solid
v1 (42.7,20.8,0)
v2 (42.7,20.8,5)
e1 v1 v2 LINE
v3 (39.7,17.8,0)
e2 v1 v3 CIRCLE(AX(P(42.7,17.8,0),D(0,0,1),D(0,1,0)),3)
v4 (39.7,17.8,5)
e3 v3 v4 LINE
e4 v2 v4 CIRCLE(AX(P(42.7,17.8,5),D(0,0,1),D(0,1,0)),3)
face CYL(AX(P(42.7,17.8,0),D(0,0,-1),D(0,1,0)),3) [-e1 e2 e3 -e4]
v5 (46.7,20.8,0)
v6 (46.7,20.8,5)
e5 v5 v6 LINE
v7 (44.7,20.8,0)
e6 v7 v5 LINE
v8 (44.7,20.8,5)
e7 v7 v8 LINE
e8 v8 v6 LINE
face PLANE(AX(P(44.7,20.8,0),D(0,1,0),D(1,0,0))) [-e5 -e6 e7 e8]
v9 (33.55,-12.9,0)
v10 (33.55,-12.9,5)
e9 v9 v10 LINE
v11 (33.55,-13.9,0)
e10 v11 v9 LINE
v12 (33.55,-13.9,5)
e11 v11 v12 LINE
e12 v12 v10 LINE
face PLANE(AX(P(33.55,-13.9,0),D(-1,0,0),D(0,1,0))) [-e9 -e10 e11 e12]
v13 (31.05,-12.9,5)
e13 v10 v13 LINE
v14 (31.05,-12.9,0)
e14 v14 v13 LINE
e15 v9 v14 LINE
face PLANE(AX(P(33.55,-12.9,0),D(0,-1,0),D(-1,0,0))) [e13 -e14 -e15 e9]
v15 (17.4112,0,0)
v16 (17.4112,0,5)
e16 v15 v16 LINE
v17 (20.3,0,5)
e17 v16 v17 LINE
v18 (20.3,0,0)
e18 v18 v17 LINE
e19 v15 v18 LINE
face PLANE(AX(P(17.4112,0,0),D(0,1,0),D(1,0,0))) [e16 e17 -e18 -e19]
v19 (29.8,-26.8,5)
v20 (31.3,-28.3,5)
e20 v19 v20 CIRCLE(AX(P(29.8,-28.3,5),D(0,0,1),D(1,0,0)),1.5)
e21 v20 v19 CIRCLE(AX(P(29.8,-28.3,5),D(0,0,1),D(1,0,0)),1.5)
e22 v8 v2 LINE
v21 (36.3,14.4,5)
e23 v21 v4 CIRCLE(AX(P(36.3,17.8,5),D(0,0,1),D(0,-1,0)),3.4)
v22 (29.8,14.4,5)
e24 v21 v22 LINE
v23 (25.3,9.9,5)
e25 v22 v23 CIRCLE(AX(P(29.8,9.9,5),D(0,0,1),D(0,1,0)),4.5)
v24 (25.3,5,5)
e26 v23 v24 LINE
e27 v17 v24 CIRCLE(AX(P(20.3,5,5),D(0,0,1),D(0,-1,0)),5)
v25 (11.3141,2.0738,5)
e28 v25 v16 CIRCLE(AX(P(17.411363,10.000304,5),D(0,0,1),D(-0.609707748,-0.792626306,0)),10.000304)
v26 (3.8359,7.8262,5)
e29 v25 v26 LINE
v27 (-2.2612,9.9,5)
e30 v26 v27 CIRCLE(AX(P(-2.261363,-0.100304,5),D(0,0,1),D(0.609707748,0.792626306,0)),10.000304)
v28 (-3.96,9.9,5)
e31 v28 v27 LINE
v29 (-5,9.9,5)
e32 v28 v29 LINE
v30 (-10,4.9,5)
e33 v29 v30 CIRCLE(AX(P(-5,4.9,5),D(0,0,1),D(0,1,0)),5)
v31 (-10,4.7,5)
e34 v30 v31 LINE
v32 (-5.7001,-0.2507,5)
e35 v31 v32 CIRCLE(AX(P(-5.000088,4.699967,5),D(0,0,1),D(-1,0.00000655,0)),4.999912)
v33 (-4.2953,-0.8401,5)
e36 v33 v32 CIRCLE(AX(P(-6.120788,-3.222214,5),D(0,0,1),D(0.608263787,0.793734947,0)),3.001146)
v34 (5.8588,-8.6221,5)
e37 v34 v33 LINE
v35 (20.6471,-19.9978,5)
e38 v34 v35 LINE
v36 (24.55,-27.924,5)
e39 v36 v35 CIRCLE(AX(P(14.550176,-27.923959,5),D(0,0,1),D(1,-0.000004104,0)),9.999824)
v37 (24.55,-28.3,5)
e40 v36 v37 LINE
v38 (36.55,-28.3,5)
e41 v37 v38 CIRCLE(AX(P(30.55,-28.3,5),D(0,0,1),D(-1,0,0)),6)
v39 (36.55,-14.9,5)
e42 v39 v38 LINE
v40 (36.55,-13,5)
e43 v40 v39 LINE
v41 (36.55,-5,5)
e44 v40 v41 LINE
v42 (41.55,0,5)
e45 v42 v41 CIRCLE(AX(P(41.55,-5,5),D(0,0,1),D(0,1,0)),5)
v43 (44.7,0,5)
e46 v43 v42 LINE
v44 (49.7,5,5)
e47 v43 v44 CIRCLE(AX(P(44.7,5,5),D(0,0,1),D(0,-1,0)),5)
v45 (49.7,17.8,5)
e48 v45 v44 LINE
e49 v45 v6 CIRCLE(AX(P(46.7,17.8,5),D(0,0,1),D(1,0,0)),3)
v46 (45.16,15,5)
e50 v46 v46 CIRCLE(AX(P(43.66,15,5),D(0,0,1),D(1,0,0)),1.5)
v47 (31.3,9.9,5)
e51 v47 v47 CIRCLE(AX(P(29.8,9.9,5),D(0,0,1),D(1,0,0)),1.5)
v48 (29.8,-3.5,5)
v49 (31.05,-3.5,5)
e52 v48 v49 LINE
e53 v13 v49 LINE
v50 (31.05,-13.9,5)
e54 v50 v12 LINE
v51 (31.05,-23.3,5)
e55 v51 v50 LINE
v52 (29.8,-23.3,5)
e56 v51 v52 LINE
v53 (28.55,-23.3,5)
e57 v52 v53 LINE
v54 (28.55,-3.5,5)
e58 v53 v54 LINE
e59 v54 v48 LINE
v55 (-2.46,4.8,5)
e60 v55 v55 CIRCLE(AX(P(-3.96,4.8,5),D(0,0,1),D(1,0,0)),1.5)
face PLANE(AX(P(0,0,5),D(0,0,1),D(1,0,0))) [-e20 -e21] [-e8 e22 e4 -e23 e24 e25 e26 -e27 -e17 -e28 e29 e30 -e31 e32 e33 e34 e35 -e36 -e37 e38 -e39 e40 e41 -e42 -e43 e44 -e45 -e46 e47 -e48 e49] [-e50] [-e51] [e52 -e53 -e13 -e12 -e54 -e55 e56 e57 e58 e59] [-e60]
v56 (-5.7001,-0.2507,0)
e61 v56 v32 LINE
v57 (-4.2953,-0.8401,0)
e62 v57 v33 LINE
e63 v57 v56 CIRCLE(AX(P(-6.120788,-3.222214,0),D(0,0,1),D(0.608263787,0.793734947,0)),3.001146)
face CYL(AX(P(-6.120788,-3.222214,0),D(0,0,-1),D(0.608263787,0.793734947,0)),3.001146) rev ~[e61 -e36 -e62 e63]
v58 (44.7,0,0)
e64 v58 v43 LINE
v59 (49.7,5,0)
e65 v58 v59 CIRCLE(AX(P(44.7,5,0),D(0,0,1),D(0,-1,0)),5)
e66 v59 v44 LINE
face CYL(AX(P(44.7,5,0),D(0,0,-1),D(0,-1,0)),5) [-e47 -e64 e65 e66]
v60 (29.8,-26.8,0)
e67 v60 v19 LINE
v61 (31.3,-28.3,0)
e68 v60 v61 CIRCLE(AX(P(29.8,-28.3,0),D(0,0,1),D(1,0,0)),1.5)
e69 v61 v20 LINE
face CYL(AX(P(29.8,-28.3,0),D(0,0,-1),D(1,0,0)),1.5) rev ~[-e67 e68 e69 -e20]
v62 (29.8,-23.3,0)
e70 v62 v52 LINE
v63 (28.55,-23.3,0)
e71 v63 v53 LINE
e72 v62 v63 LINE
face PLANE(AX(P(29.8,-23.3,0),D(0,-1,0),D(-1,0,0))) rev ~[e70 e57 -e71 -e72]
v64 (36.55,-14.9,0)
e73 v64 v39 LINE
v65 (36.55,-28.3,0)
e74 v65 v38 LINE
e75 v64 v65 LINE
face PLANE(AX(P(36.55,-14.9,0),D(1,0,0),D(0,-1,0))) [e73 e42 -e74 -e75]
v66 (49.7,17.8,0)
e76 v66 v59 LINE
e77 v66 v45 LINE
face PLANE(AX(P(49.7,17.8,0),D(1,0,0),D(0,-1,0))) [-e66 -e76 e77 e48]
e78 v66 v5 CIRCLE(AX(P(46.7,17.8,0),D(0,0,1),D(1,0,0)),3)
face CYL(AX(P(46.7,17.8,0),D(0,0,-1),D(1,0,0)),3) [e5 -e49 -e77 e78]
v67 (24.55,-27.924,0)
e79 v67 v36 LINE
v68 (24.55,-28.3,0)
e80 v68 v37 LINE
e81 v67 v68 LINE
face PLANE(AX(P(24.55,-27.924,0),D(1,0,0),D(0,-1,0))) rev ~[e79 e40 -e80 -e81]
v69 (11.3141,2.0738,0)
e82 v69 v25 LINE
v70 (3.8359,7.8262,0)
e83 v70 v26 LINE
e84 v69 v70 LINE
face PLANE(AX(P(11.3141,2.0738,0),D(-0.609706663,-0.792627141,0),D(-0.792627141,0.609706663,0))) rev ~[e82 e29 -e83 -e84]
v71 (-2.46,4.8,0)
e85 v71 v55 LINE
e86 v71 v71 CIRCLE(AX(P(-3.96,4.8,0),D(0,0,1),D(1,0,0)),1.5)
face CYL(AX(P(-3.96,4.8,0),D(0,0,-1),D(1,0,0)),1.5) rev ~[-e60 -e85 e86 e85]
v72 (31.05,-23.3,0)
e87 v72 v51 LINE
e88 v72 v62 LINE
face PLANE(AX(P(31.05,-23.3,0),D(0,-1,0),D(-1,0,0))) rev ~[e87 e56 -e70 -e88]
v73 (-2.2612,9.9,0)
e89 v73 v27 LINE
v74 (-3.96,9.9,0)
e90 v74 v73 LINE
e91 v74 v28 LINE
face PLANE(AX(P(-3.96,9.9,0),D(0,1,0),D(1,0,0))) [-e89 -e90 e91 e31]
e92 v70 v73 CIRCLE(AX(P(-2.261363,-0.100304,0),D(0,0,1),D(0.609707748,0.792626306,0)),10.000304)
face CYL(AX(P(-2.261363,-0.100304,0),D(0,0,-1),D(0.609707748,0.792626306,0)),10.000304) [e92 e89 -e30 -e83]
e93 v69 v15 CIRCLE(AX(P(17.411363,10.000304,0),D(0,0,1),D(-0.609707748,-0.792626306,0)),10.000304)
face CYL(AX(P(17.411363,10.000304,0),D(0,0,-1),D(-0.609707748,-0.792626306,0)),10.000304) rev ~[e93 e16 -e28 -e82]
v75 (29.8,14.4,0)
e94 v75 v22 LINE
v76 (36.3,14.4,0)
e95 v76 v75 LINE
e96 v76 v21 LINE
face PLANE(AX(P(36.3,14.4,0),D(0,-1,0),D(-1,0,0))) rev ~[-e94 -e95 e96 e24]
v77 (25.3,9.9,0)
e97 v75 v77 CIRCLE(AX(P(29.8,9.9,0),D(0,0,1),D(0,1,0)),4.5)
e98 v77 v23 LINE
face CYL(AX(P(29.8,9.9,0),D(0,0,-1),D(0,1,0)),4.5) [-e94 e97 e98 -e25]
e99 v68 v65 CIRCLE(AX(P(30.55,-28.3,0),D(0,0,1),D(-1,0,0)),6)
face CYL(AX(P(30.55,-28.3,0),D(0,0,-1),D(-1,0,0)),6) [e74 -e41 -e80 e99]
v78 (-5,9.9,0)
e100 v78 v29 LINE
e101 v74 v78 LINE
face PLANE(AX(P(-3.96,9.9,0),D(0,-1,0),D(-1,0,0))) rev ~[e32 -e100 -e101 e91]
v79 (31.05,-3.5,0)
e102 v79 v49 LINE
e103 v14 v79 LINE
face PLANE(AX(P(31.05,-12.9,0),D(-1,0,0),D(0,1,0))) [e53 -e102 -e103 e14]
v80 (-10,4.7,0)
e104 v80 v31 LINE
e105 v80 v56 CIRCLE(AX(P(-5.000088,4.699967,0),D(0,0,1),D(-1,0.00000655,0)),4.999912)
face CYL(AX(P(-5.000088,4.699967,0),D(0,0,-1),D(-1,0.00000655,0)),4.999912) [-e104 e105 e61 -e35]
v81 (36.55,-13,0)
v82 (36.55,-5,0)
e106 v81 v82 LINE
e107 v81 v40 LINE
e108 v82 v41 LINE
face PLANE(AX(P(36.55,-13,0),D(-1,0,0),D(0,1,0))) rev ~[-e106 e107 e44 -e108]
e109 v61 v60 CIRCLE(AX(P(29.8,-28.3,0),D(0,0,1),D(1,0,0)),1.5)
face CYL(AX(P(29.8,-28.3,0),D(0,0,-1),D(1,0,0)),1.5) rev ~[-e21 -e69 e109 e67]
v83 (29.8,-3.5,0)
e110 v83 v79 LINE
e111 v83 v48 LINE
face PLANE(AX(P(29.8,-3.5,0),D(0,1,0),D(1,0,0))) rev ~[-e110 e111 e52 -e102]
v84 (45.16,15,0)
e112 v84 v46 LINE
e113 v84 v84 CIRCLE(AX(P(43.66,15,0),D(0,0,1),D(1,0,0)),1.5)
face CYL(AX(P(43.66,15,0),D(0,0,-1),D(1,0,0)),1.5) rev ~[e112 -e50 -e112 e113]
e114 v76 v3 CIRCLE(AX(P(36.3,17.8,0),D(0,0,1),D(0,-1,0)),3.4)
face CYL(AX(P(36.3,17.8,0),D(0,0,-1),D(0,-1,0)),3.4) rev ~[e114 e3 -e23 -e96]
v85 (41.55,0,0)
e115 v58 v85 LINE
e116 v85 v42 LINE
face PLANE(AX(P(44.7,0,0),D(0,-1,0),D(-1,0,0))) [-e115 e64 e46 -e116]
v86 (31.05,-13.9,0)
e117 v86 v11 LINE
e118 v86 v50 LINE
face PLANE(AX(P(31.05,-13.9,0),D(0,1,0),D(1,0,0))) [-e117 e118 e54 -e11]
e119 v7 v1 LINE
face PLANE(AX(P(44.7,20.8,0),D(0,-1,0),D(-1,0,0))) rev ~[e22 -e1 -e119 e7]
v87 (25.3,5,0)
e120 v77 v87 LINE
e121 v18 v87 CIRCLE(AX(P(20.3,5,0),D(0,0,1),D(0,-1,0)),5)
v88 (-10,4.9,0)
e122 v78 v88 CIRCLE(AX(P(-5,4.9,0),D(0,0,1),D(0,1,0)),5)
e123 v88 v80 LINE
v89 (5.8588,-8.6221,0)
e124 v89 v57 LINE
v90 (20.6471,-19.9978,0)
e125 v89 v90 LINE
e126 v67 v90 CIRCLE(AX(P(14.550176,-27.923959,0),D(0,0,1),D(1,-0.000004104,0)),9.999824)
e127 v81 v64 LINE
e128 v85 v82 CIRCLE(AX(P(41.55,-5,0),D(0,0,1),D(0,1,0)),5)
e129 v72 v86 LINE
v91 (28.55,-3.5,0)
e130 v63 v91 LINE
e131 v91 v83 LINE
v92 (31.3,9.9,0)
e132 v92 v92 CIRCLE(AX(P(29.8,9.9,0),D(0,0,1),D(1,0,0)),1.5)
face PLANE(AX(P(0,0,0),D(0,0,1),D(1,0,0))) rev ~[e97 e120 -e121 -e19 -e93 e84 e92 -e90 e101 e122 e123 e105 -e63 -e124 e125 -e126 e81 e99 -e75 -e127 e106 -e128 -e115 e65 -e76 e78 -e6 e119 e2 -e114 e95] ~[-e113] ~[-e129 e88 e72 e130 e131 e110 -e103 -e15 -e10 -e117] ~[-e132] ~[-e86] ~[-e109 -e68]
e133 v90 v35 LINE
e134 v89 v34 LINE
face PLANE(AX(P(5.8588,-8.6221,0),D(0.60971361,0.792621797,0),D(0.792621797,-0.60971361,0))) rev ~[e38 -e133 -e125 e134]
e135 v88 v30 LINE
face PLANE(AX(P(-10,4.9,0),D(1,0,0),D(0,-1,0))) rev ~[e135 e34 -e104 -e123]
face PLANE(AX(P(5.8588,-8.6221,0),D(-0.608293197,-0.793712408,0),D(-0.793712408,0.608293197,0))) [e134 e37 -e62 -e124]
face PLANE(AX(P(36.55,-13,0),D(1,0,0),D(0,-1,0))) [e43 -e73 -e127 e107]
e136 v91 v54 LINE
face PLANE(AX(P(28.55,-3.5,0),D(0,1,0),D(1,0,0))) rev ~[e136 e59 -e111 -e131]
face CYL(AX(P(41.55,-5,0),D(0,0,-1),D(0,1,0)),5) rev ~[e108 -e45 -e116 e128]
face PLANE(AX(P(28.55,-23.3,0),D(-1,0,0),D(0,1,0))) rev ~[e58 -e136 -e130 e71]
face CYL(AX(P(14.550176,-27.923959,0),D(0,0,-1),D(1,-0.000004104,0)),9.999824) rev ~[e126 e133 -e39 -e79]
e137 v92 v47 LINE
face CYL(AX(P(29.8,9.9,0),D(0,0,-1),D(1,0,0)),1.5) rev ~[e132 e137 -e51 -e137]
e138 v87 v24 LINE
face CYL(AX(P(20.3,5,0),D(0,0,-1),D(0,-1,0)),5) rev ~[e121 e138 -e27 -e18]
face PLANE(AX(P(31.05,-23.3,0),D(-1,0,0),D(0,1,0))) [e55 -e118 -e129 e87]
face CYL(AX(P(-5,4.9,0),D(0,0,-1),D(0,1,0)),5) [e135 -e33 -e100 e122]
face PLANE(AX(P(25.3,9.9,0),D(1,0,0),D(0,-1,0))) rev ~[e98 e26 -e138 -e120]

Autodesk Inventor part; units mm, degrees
ref_plane "YZ Plane" through (0, 0, 0) normal (1, 0, 0) x (0, 1, 0)
ref_plane "XZ Plane" through (0, 0, 0) normal (0, 1, 0) x (-1, 0, 0)
ref_plane "XY Plane" through (0, 0, 0) normal (0, 0, 1) x (1, 0, 0)
sketch "Sketch1" plane through (0, 0, 0) normal (0, 0, 1) x (1, 0, 0)
  line L0 (17.4112, 0) -> (20.3, 0)
  circle A0 centre (43.66, 15) radius 1.5
  circle A1 centre (-3.96, 4.8) radius 1.5
  line L1 (29.8, -3.5) -> (31.05, -3.5)
  line L2 (31.05, -23.3) -> (28.55, -23.3)
  line L3 (28.55, -23.3) -> (28.55, -3.5)
  line L4 (28.55, -3.5) -> (29.8, -3.5)
  line L5 (29.8, -23.3) -> (29.8, -28.3)
  circle A2 centre (29.8, -28.3) radius 1.5
  line L6 (31.05, -23.3) -> (31.05, -13.9)
  line L7 (31.05, -13.9) -> (33.55, -13.9)
  line L8 (33.55, -13.9) -> (33.55, -12.9)
  line L9 (33.55, -12.9) -> (31.05, -12.9)
  line L10 (31.05, -12.9) -> (31.05, -3.5)
  line L11 (36.55, -14.9) -> (36.55, -28.3)
  line L12 (49.7, 17.8) -> (49.7, 5)
  line L13 (36.55, -13) -> (36.55, -14.9)
  arc A3 (24.55, -28.3) -> (36.55, -28.3) centre (30.55, -28.3) ccw
  line L14 (24.55, -27.924) -> (24.55, -28.3)
  line L15 (5.8588, -8.6221) -> (20.6471, -19.9978)
  circle A4 centre (29.8, 9.9) radius 1.5
  arc A5 (29.8, 14.4) -> (25.3, 9.9) centre (29.8, 9.9) ccw
  line L16 (25.3, 9.9) -> (25.3, 5)
  line L17 (36.55, -13) -> (36.55, -5)
  line L18 (44.7, 0) -> (41.55, 0)
  line L19 (36.3, 14.4) -> (29.8, 14.4)
  arc A6 (36.3, 14.4) -> (39.7, 17.8) centre (36.3, 17.8) ccw
  arc A7 (41.55, 0) -> (36.55, -5) centre (41.55, -5) ccw
  arc A8 (44.7, 0) -> (49.7, 5) centre (44.7, 5) ccw
  arc A9 (20.3, 0) -> (25.3, 5) centre (20.3, 5) ccw
  arc A10 (24.55, -27.924) -> (20.6471, -19.9978) centre (14.55, -27.924) ccw
  line L20 (-3.96, 9.9) -> (-2.2612, 9.9)
  line L21 (-3.96, 9.9) -> (-5, 9.9)
  line L22 (-10, 4.9) -> (-10, 4.7)
  line L23 (11.3141, 2.0738) -> (3.8359, 7.8262)
  arc A11 (11.3141, 2.0738) -> (17.4112, 0) centre (17.4112, 10) ccw
  arc A12 (3.8359, 7.8262) -> (-2.2612, 9.9) centre (-2.2612, -0.1) ccw
  arc A13 (-5, 9.9) -> (-10, 4.9) centre (-5, 4.9) ccw
  arc A14 (-10, 4.7) -> (-5.7001, -0.2507) centre (-5, 4.7) ccw
  line L24 (5.8588, -8.6221) -> (-4.2953, -0.8401)
  arc A15 (-4.2953, -0.8401) -> (-5.7001, -0.2507) centre (-6.1202, -3.2212) ccw
  line L25 (39.7, 17.8) -> (39.7, 17.8)
  line L26 (49.7, 17.8) -> (49.7, 17.8)
  line L27 (44.7, 20.8) -> (46.7, 20.8)
  line L28 (44.7, 20.8) -> (42.7, 20.8)
  arc A16 (42.7, 20.8) -> (39.7, 17.8) centre (42.7, 17.8) ccw
  arc A17 (49.7, 17.8) -> (46.7, 20.8) centre (46.7, 17.8) ccw
  dimension "d13" = 1.25
  dimension "d15" = 2.5
  dimension "d16" = 19.8
  dimension "d17" = 5
  dimension "d25" = 9.4
  dimension "d26" = 2.5
  dimension "d27" = 1
  dimension "d70" = 5
  dimension "d71" = 5
  dimension "d72" = 10
  dimension "d79" = 10
  dimension "d80" = 5
  dimension "d83" = 3
  dimension "d85" = 3
extrude "Extrusion1" add sketch "Sketch1" along normal blind 5
properties part number "braket bawah 2"
